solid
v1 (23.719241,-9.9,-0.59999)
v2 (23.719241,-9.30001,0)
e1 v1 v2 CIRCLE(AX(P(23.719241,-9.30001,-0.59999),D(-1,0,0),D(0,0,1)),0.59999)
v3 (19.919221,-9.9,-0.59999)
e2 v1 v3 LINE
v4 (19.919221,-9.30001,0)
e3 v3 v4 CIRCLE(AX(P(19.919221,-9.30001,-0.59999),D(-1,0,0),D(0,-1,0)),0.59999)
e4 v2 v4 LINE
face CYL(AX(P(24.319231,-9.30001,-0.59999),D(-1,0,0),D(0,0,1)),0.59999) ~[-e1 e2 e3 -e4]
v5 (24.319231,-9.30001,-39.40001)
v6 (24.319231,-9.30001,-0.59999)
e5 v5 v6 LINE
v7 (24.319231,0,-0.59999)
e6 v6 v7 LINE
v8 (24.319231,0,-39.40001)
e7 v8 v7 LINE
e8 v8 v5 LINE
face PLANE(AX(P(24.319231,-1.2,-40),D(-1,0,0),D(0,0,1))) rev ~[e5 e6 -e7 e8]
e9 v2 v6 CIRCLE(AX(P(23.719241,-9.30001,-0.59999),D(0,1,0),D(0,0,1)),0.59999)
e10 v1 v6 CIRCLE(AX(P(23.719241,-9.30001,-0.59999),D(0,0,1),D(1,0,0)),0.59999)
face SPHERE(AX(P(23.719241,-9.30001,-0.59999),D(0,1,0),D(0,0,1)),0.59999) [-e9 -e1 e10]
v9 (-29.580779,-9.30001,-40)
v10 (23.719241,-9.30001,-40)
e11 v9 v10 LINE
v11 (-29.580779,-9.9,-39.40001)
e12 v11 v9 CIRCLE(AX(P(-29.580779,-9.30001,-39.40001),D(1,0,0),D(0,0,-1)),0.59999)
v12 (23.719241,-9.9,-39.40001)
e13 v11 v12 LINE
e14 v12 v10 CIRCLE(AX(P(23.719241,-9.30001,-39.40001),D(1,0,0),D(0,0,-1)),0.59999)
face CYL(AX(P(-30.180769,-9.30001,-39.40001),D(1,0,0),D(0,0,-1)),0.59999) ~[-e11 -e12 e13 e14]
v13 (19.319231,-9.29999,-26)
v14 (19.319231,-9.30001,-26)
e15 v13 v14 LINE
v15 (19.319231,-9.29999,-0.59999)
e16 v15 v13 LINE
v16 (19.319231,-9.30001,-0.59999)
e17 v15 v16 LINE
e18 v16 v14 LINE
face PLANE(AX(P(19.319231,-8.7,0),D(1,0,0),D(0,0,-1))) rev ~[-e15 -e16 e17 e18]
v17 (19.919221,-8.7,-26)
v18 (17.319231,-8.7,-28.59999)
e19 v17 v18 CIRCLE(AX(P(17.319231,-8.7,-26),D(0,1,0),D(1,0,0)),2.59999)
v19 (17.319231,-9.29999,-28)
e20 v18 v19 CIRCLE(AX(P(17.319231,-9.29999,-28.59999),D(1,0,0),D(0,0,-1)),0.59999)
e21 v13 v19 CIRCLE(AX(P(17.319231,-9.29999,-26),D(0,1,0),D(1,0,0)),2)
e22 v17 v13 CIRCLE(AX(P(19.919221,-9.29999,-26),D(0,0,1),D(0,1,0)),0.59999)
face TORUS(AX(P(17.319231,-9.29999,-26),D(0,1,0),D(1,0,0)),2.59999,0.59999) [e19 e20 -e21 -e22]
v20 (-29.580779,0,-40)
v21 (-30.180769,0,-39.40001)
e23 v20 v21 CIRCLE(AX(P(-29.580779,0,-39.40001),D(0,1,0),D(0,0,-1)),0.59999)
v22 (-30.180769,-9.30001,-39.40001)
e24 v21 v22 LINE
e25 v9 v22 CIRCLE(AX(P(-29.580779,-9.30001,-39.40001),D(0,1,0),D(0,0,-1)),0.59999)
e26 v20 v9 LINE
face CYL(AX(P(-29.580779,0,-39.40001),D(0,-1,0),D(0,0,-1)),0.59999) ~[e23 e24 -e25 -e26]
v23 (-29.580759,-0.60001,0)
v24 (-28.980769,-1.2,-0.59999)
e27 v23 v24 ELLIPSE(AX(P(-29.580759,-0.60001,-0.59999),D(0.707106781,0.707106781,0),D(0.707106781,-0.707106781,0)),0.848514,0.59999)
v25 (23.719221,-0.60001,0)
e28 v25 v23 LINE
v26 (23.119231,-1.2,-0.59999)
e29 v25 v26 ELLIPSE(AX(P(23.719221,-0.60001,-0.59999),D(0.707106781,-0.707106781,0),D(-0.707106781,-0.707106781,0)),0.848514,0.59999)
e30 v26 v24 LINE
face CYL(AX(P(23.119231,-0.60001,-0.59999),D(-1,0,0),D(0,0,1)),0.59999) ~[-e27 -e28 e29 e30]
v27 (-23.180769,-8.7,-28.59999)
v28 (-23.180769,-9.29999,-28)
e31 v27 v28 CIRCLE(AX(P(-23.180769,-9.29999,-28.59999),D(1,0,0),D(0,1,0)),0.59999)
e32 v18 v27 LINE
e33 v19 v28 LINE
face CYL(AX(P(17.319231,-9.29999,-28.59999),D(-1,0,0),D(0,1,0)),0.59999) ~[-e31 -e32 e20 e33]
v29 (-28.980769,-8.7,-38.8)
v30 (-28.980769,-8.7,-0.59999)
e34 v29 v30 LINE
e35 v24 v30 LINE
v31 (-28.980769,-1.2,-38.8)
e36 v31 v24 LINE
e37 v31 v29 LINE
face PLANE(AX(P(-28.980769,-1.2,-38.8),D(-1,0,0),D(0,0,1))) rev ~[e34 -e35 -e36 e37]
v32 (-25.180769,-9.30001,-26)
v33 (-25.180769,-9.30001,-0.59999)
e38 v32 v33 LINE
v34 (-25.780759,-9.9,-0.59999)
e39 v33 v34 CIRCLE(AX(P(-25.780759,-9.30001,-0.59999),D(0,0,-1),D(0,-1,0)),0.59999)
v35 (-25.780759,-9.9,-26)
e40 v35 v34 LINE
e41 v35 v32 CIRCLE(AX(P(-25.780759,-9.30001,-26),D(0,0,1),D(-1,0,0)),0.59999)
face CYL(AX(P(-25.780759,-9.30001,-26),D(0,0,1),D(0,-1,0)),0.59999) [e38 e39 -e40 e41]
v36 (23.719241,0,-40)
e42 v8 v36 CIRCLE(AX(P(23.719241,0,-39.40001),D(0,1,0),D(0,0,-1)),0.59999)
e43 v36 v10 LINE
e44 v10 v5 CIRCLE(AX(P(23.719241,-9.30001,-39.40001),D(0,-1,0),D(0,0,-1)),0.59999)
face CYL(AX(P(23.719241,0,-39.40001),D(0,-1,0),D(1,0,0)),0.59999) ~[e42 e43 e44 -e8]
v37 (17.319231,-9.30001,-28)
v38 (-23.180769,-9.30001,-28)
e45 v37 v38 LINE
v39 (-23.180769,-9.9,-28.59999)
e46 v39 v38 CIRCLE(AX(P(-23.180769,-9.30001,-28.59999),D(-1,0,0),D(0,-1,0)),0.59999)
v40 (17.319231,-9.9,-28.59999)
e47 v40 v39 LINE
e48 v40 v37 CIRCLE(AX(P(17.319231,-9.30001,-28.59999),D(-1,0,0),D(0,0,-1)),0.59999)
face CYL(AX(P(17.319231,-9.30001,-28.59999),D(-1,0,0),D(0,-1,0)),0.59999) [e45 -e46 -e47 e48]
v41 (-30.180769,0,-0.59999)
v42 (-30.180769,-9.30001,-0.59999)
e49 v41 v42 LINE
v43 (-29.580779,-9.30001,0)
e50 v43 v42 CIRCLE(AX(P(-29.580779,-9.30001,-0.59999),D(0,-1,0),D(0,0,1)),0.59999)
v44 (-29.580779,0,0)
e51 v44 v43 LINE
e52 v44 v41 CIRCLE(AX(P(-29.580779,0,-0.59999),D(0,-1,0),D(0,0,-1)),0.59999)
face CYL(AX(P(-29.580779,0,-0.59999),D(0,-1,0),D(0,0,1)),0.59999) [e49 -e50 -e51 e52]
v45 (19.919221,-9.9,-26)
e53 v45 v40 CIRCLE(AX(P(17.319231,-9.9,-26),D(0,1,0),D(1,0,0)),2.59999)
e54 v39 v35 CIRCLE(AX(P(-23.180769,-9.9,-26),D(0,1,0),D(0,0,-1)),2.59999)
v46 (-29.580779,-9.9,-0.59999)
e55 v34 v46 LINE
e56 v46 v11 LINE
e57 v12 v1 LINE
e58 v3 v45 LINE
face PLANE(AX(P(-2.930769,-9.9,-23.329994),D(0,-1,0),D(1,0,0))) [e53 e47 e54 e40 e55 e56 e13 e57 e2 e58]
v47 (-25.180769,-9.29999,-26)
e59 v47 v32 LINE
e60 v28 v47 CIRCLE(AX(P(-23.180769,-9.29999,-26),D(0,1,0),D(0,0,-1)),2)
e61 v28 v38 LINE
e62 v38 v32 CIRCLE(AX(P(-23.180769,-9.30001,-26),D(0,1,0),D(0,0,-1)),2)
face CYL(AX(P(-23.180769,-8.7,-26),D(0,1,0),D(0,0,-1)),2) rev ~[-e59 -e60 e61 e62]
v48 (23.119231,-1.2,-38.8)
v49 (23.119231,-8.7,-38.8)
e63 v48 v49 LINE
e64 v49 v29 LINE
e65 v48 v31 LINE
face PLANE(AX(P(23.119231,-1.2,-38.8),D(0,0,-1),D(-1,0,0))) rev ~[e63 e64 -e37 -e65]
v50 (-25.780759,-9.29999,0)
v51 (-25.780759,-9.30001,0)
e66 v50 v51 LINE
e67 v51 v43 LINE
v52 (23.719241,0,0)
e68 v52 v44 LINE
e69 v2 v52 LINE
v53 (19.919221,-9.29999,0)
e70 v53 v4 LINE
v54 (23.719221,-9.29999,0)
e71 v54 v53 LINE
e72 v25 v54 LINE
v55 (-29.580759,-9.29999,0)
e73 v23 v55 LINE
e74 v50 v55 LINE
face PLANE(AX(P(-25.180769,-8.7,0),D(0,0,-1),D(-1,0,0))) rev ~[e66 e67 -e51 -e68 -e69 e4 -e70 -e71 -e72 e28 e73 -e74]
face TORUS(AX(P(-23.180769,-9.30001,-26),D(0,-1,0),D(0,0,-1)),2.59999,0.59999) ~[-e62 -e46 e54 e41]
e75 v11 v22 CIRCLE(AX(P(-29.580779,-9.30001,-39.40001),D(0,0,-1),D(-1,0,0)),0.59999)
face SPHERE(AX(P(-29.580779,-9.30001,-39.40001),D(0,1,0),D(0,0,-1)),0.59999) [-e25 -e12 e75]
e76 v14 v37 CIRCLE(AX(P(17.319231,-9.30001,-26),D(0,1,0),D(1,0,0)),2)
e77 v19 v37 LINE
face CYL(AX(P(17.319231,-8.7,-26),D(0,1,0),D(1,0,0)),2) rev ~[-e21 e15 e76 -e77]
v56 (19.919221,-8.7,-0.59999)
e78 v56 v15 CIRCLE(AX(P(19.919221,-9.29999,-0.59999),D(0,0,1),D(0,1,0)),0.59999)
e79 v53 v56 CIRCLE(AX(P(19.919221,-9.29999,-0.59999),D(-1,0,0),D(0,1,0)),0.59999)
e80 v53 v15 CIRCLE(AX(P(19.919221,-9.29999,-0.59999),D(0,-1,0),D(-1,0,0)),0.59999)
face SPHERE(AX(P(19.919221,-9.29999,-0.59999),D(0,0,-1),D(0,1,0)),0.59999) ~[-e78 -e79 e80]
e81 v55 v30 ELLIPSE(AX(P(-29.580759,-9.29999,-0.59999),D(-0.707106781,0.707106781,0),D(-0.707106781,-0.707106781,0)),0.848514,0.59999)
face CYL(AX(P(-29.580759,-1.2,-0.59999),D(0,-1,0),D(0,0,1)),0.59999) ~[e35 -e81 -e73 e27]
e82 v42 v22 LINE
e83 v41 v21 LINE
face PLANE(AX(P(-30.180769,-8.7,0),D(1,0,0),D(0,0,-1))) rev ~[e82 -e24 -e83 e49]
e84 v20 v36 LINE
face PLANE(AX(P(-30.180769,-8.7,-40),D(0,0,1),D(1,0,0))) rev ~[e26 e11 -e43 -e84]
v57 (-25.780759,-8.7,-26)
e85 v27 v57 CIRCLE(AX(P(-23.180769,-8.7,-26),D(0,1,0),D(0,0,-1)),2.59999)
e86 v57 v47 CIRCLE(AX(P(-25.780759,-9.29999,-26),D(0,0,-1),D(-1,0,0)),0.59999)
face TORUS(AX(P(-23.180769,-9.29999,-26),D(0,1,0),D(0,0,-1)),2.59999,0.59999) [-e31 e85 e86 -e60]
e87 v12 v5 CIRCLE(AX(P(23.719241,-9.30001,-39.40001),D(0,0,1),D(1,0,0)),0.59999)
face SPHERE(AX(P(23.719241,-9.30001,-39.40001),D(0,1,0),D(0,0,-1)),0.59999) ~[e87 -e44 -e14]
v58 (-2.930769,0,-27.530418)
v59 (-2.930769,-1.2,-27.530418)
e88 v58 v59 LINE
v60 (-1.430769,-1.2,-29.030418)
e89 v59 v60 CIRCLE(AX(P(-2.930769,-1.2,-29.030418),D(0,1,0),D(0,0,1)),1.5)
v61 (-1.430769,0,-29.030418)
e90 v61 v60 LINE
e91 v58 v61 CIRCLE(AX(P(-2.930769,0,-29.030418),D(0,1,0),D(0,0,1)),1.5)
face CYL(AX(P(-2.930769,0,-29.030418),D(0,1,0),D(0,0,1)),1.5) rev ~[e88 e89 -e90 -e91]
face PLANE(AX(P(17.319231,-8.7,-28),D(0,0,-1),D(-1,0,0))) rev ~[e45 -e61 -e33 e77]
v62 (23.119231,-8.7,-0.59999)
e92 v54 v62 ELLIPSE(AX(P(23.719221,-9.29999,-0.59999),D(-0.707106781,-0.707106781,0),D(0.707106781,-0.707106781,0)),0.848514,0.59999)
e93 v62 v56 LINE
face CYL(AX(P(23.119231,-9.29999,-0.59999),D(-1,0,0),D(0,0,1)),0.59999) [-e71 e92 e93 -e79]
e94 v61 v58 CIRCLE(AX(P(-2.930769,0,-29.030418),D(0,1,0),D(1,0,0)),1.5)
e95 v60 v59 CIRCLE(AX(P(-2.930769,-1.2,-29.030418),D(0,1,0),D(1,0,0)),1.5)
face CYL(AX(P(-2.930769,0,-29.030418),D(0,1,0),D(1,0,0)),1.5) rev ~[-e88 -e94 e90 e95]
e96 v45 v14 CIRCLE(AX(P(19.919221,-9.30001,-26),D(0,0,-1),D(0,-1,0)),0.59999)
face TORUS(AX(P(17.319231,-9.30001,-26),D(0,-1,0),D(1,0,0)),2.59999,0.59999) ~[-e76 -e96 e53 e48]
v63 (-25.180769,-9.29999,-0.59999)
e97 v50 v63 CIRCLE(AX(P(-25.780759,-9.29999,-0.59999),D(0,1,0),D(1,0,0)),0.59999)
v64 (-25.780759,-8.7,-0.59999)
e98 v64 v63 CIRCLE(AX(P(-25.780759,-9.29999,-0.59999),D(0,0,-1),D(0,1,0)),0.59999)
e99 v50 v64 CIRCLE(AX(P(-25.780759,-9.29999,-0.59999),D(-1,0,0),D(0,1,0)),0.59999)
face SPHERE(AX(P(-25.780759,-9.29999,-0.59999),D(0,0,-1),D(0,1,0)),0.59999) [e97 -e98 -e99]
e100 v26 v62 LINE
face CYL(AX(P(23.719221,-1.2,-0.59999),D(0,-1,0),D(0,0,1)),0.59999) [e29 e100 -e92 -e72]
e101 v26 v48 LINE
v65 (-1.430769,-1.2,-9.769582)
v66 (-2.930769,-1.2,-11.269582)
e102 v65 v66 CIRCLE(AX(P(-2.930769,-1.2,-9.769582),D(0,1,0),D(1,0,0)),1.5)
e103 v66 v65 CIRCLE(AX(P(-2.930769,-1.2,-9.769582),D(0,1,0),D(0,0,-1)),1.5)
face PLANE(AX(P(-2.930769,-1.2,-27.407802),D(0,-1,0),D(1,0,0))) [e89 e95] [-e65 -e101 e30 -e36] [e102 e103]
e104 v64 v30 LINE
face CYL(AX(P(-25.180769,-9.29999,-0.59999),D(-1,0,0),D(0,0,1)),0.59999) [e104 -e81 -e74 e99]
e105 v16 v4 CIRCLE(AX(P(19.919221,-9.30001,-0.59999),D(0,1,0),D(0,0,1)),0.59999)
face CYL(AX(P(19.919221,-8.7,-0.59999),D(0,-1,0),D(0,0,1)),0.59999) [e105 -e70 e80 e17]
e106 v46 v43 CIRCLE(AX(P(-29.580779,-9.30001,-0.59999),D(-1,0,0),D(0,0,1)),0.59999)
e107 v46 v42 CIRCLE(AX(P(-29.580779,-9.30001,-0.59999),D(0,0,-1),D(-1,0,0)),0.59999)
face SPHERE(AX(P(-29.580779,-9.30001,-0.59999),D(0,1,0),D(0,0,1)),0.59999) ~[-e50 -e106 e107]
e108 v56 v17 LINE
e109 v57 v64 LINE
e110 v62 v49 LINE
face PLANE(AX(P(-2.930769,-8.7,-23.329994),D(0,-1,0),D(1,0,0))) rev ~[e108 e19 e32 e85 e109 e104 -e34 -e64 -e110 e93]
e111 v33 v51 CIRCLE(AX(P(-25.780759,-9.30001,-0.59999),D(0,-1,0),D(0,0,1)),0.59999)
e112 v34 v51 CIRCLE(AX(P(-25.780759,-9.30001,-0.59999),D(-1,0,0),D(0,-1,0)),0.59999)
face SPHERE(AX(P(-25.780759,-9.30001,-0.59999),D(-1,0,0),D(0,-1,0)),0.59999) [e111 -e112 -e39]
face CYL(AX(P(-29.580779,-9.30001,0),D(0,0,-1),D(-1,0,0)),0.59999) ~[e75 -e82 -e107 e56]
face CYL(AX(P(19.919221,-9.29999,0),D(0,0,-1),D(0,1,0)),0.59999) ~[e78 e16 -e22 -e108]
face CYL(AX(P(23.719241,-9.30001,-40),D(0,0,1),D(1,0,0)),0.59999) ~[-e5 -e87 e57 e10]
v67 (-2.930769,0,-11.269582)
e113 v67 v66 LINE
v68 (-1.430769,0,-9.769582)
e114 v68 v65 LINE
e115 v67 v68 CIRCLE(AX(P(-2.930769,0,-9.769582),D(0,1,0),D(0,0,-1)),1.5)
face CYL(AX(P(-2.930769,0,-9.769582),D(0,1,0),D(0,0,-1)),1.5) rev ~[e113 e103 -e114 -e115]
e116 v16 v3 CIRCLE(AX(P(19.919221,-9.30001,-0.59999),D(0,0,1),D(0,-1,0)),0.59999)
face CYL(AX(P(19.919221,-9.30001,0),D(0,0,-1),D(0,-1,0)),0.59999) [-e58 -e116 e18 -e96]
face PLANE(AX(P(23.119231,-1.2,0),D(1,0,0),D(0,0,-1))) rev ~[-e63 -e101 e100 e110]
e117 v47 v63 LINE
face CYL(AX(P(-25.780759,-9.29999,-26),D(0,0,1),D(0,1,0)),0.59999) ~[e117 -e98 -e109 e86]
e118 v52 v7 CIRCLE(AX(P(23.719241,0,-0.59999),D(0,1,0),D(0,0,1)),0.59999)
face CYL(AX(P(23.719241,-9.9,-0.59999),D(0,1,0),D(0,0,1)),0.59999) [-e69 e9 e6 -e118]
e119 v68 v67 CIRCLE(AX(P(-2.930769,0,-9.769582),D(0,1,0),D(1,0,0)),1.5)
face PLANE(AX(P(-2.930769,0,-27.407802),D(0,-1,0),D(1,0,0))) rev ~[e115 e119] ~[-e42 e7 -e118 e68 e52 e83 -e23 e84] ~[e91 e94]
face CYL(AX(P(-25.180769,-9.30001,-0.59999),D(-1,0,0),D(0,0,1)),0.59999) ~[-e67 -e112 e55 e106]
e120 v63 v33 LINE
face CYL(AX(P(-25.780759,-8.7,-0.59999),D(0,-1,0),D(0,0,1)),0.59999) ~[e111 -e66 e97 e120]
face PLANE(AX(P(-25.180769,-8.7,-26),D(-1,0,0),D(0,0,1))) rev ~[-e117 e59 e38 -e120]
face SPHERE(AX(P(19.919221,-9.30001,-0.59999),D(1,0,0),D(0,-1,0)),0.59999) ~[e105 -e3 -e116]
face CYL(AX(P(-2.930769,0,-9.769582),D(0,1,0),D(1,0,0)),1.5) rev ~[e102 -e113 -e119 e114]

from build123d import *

# Parameters (mm, degrees)
F1_DEPTH = 1.2
F3_DEPTH = 7.5
F5_DEPTH = 1.2
F6_R     = 0.59999


# Not quite as in the source:
# - a fillet or chamfer is up to 0.001 mm smaller than in the source, because OpenCascade refuses the exact size


with BuildPart() as f1:
    # F0 (on Front) → F1 (new body)
    with BuildSketch(Plane.XZ):
        Polygon((-28.9807687655, 0), (-30.1807687655, 0), (-30.1807687655, -40), (24.3192312345, -40), (24.3192312345, 0), (23.1192312345, 0), (23.1192312345, -38.8), (-28.9807687655, -38.8), align=None)
        Polygon((-2.9307687655, -19.4), (-28.9807687655, 0), (-28.9807687655, -38.8), align=None)
        with BuildLine():
            Line((23.1192312345, 0), (-28.9807687655, 0))
            Line((-28.9807687655, 0), (-2.9307687655, -19.4))
            Line((-2.9307687655, -19.4), (-2.9307687655, -11.2695819765))
            ThreePointArc((-2.9307687655, -11.2695819765), (-3.9914289373, -8.7089218048), (-1.4307687655, -9.7695819765))
            Line((-1.4307687655, -9.7695819765), (3.4249790478, -9.7695819765))
            Line((3.4249790478, -9.7695819765), (3.4249790478, -14.6667367532))
            Line((3.4249790478, -14.6667367532), (23.1192312345, 0))
        make_face()
        Polygon((23.1192312345, -38.8), (23.1192312345, 0), (3.4249790478, -14.6667367532), (3.4249790478, -19.4), (3.3088028431, -19.4), (3.3088028431, -24.0467443074), align=None)
        with BuildLine():
            Line((-2.9307687655, -19.4), (-28.9807687655, -38.8))
            Line((-28.9807687655, -38.8), (23.1192312345, -38.8))
            Line((23.1192312345, -38.8), (3.3088028431, -24.0467443074))
            Line((3.3088028431, -24.0467443074), (3.3088028431, -29.0304180235))
            Line((3.3088028431, -29.0304180235), (-1.4307687655, -29.0304180235))
            ThreePointArc((-1.4307687655, -29.0304180235), (-3.9914289373, -30.0910781952), (-2.9307687655, -27.5304180235))
            Line((-2.9307687655, -27.5304180235), (-2.9307687655, -19.4))
        make_face()
        with BuildLine():
            Line((3.3088028431, -24.0467443074), (-2.9307687655, -19.4))
            Line((-2.9307687655, -19.4), (-2.9307687655, -27.5304180235))
            ThreePointArc((-2.9307687655, -27.5304180235), (-1.8701085937, -27.9697578517), (-1.4307687655, -29.0304180235))
            Line((-1.4307687655, -29.0304180235), (3.3088028431, -29.0304180235))
            Line((3.3088028431, -29.0304180235), (3.3088028431, -24.0467443074))
        make_face()
        Polygon((3.3088028431, -19.4), (-2.9307687655, -19.4), (3.3088028431, -24.0467443074), align=None)
        Polygon((3.4249790478, -14.6667367532), (-2.9307687655, -19.4), (3.3088028431, -19.4), (3.4249790478, -19.4), align=None)
        with BuildLine():
            Line((-2.9307687655, -11.2695819765), (-2.9307687655, -19.4))
            Line((-2.9307687655, -19.4), (3.4249790478, -14.6667367532))
            Line((3.4249790478, -14.6667367532), (3.4249790478, -9.7695819765))
            Line((3.4249790478, -9.7695819765), (-1.4307687655, -9.7695819765))
            ThreePointArc((-1.4307687655, -9.7695819765), (-1.8701085937, -10.8302421483), (-2.9307687655, -11.2695819765))
        make_face()
    extrude(amount=F1_DEPTH)

    # F2 (on face) → F3 (join)
    with BuildSketch(Plane.XZ.offset(1.2)):
        Polygon((-30.1807687655, 0), (-30.1807687655, -40), (24.3192312345, -40), (24.3192312345, 0), (23.1192312345, 0), (23.1192312345, -38.8), (-28.9807687655, -38.8), (-28.9807687655, 0), align=None)
    extrude(amount=F3_DEPTH)

    # F4 (on face) → F5 (join)
    with BuildSketch(Plane.XZ.offset(8.7)):
        with BuildLine():
            Line((-25.1807687655, 0), (-28.9807687655, 0))
            Line((-28.9807687655, 0), (-28.9807687655, -38.8))
            Line((-28.9807687655, -38.8), (23.1192312345, -38.8))
            Line((23.1192312345, -38.8), (23.1192312345, 0))
            Line((23.1192312345, 0), (19.3192312345, 0))
            Line((19.3192312345, 0), (19.3192312345, -26))
            ThreePointArc((19.3192312345, -26), (18.7334447969, -27.4142135624), (17.3192312345, -28))
            Line((17.3192312345, -28), (-23.1807687655, -28))
            ThreePointArc((-23.1807687655, -28), (-24.5949823279, -27.4142135624), (-25.1807687655, -26))
            Line((-25.1807687655, -26), (-25.1807687655, 0))
        make_face()
        Polygon((-30.1807687655, 0), (-30.1807687655, -40), (24.3192312345, -40), (24.3192312345, 0), (23.1192312345, 0), (23.1192312345, -38.8), (-28.9807687655, -38.8), (-28.9807687655, 0), align=None)
    extrude(amount=F5_DEPTH)

    # F6 (radius 0.6 in the source; OpenCascade refuses exactly that, so slightly less here)
    f6_edges = [f1.edges().sort_by_distance(p)[0] for p in [
        (-30.180769, -4.95, -40),
        (24.319231, -4.95, -40),
        (-30.180769, -4.95, 0),
        (-27.680769, -9.9, 0),
        (24.319231, -4.95, 0),
        (21.819231, -9.9, 0),
        (-2.930769, -9.9, -40),
        (24.319231, -9.9, -20),
        (-30.180769, -9.9, -20),
        (-25.180769, -9.9, -13),
        (-2.930769, -8.7, -28),
        (19.319231, -8.7, -13),
        (-27.080769, -8.7, 0),
        (-28.980769, -4.95, 0),
        (23.119231, -4.95, 0),
        (21.219231, -8.7, 0),
        (19.319231, -9.3, 0),
        (-25.180769, -9.3, 0),
        (-2.930769, -1.2, 0),
    ]]
    fillet(f6_edges, radius=F6_R)


solid = f1.part
